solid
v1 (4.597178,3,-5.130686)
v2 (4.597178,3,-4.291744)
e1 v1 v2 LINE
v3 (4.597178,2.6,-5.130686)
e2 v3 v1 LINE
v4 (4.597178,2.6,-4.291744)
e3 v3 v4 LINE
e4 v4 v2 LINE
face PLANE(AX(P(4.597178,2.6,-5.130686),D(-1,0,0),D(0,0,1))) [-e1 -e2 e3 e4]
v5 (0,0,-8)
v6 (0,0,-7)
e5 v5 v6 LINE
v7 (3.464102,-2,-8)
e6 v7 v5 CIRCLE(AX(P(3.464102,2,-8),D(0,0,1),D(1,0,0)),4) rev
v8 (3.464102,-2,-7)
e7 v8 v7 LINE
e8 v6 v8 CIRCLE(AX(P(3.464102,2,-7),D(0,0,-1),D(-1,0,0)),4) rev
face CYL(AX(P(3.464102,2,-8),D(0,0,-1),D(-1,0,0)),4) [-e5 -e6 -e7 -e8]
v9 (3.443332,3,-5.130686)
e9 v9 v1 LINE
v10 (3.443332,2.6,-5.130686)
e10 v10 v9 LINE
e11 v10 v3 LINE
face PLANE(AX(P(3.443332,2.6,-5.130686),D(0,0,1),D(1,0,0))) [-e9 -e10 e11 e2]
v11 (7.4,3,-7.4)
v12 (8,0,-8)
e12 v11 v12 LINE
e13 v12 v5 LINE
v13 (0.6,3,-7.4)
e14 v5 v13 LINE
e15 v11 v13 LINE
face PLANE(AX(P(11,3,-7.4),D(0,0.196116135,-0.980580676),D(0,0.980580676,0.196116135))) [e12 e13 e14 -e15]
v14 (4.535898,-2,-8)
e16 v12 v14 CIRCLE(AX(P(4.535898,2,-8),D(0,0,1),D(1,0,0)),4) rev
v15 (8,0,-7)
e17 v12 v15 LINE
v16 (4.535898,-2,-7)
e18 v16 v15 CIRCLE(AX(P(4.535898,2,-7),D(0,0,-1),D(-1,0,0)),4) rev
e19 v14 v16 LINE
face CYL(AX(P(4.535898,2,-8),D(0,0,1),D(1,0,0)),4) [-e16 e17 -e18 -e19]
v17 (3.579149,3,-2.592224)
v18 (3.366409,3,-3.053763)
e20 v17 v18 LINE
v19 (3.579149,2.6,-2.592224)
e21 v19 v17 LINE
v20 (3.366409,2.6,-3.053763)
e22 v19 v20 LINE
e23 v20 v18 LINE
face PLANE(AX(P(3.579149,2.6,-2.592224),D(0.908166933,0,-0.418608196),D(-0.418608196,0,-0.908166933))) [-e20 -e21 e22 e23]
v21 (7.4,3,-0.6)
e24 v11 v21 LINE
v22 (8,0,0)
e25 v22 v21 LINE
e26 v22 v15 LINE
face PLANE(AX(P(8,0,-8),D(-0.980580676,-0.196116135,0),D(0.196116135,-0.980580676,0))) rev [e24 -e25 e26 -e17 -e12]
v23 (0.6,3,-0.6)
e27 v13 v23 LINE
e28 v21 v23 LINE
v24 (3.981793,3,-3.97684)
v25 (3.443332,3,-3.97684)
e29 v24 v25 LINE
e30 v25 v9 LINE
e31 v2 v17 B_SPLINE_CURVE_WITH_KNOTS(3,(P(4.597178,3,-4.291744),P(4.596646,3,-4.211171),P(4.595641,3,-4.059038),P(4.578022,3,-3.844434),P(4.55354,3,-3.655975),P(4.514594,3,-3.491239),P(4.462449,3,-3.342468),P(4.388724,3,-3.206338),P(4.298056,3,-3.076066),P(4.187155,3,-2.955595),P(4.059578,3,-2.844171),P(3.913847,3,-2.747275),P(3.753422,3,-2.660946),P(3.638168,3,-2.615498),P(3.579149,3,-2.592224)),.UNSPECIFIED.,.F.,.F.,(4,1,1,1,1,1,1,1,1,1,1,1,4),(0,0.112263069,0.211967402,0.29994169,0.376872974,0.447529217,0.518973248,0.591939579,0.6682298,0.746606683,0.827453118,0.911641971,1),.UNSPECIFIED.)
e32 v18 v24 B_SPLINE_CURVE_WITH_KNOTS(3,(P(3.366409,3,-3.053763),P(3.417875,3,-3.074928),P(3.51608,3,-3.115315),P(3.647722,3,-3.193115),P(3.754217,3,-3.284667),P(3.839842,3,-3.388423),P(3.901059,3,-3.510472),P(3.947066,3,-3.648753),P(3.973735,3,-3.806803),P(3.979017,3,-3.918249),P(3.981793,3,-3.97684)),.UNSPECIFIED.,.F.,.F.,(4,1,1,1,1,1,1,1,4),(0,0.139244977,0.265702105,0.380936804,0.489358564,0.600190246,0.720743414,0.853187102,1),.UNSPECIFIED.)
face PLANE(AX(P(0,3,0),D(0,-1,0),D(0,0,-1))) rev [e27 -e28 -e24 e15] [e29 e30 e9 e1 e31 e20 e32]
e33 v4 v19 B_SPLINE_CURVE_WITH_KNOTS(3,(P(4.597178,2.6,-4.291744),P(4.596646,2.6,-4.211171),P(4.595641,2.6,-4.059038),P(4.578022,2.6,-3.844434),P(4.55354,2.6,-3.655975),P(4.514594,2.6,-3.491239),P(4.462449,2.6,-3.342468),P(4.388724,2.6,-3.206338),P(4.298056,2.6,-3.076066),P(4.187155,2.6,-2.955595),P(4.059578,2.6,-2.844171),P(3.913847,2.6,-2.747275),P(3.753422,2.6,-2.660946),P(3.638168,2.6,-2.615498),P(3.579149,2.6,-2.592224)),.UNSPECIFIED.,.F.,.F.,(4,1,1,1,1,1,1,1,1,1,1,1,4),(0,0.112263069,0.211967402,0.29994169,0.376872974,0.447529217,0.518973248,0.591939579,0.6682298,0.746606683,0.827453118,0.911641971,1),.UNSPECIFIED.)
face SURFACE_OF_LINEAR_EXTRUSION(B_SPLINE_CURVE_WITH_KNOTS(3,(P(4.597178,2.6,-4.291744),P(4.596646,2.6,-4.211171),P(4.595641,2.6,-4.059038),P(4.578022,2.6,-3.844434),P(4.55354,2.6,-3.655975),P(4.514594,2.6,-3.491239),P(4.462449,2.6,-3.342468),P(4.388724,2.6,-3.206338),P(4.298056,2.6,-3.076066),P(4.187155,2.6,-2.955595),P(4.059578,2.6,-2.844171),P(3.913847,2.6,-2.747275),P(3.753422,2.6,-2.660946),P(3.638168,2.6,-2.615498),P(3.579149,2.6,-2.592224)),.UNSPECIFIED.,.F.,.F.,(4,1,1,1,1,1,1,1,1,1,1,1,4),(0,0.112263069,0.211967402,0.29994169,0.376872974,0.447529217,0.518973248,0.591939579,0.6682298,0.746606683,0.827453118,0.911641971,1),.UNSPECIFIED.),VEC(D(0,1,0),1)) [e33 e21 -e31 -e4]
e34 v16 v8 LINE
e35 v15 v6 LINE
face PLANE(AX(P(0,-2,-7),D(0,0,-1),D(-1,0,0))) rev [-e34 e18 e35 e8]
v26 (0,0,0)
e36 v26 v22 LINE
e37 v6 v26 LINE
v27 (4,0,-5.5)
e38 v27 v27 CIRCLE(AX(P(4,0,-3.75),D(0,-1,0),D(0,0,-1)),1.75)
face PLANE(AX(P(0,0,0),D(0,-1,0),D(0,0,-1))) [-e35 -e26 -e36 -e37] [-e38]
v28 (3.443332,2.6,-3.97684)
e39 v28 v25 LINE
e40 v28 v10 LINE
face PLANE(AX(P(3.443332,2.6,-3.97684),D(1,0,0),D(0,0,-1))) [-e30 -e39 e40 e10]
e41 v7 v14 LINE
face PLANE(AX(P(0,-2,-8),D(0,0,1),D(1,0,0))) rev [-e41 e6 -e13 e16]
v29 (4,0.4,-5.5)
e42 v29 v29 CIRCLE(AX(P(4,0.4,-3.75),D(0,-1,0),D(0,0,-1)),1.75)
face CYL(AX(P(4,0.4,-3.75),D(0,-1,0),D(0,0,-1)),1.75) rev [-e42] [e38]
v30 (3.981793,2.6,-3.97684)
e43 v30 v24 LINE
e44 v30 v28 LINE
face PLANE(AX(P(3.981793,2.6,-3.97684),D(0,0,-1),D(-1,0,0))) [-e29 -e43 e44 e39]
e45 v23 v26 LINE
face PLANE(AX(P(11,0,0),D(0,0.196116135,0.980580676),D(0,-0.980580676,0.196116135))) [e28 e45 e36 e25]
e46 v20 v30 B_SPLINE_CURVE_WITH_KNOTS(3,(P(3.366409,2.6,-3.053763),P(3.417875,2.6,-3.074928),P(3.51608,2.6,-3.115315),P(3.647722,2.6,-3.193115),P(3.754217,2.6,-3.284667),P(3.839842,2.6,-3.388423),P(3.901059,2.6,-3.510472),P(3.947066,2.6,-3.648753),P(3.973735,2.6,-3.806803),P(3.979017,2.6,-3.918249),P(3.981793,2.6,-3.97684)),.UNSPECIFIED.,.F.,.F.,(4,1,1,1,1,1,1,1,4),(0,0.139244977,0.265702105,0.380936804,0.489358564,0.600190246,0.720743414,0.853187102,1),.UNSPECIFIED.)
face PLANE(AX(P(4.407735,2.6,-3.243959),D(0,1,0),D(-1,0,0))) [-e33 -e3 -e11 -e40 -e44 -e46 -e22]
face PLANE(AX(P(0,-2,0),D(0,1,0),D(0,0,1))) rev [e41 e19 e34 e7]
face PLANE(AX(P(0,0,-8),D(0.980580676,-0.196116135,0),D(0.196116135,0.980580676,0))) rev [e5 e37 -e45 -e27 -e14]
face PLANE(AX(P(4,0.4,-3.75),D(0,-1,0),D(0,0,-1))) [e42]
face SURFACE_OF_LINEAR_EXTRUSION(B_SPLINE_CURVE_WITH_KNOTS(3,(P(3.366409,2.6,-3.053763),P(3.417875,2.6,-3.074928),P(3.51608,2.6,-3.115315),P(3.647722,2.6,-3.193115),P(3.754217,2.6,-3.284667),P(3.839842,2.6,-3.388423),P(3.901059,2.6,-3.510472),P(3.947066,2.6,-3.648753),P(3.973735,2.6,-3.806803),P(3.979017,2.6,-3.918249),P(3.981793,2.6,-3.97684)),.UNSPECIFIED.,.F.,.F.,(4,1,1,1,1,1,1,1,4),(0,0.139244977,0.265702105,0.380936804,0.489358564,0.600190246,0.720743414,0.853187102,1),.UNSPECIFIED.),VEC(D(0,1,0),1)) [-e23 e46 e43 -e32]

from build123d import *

# Parameters (mm, degrees)
SKETCH1_W               = 8
SKETCH1_H               = 8
BOSS_EXTRUDE1_DEPTH     = 3
CUT_EXTRUDE1_DEPTH      = 12.704699911
CUT_EXTRUDE1_DEPTH_BACK = 12.704699911
CUT_EXTRUDE2_DEPTH      = 11
SKETCH4_R               = 1.75
CUT_EXTRUDE3_DEPTH      = 0.4
SKETCH5_W               = 8
SKETCH5_H               = 1
BOSS_EXTRUDE2_DEPTH     = 2
FILLET1_R               = 4
CUT_EXTRUDE4_DEPTH      = 0.4


with BuildPart() as part:
    # Sketch1 → Boss-Extrude1 (new body)
    with BuildSketch(Plane(origin=(0, 0, 0), x_dir=(1, 0, 0), z_dir=(0, 1, 0))):
        with Locations((4, 4)):
            Rectangle(SKETCH1_W, SKETCH1_H)
    extrude(amount=BOSS_EXTRUDE1_DEPTH)

    # Sketch2 → Cut-Extrude1 (cut, two sides: drawn at the far end of the back side and taken through both)
    with BuildSketch(Plane.XY.offset(-CUT_EXTRUDE1_DEPTH_BACK)):
        Polygon((0, 0), (0.6, 3), (0, 3), align=None)
        Polygon((8, 0), (7.4, 3), (8, 3), align=None)
    extrude(amount=CUT_EXTRUDE1_DEPTH + CUT_EXTRUDE1_DEPTH_BACK, mode=Mode.SUBTRACT)

    # Sketch3 → Cut-Extrude2 (cut)
    with BuildSketch(Plane(origin=(0, 0, 0), x_dir=(0, 0, -1), z_dir=(1, 0, 0))):
        Polygon((0, 0), (0.6, 3), (0, 3), align=None)
        Polygon((8, 3), (7.4, 3), (8, 0), align=None)
    extrude(amount=CUT_EXTRUDE2_DEPTH, mode=Mode.SUBTRACT)

    # Sketch4 → Cut-Extrude3 (cut)
    with BuildSketch(Plane.XZ):
        with Locations(Location((4, -3.75, 0), (0, 0, 270))):
            Circle(SKETCH4_R)
    extrude(amount=-CUT_EXTRUDE3_DEPTH, mode=Mode.SUBTRACT)

    # Sketch5 → Boss-Extrude2 (add)
    with BuildSketch(Plane.XZ):
        with Locations((4, -7.5)):
            Rectangle(SKETCH5_W, SKETCH5_H)
    extrude(amount=BOSS_EXTRUDE2_DEPTH)

    # Fillet1
    # the kernel refuses this fillet: 4 mm, written as the material it takes off along each edge
    with BuildSketch(Plane(origin=(8, -2, -16.660254038), x_dir=(0, 1, 0), z_dir=(0, 0, 1)), Plane(origin=(0, -2, 1.660254038), x_dir=(0, 1, 0), z_dir=(0, 0, -1))) as fillet1_piece_1:
        with BuildLine():
            CenterArc((4, 3.464101615), FILLET1_R, 180, 60)
            Line((0, 3.464101615), (-0.08, 3.464101615))
            Line((-0.08, 3.464101615), (-0.08, 0))
            Line((-0.08, 0), (0, -0.08))
            ThreePointArc((0, -0.08), (1, -0.08), (1.96, -0.069282032))
            Line((1.96, -0.069282032), (2, 0))
        make_face()
    extrude(amount=18.320508076, mode=Mode.SUBTRACT)

    # Sketch6 → Cut-Extrude4 (cut)
    with BuildSketch(Plane(origin=(0, 3, 0), x_dir=(1, 0, 0), z_dir=(0, 1, 0))):
        with BuildLine():
            Line((3.443331895, 5.130686034), (4.597178049, 5.130686034))
            Line((4.597178049, 5.130686034), (4.597178049, 4.291743727))
            add(Edge.make_bspline(
                [(4.597178049, 4.291743727), (4.596645702, 4.211170655), (4.595640561, 4.059038126), (4.578021597, 3.844434295), (4.553540207, 3.655975372), (4.51459395, 3.491238943), (4.462448704, 3.342468302), (4.388723742, 3.206338125), (4.298056147, 3.076066307), (4.187154731, 2.955594738), (4.059577941, 2.844170634), (3.913847481, 2.747275335), (3.753421756, 2.660946408), (3.638168327, 2.615497851), (3.579149203, 2.592224496)],
                knots=[0, 0, 0, 0, 1.347156832, 2.543608823, 3.599300285, 4.522475688, 5.370350604, 6.227678973, 7.103274953, 8.018757603, 8.959280198, 9.929437417, 10.939703653, 12, 12, 12, 12], degree=3))
            Line((3.579149203, 2.592224496), (3.366408818, 3.053762957))
            add(Edge.make_bspline(
                [(3.366408818, 3.053762957), (3.417874874, 3.07492834), (3.516080495, 3.11531534), (3.647721841, 3.193115232), (3.754216523, 3.284666717), (3.839841548, 3.388423011), (3.901059293, 3.510472084), (3.947065575, 3.648752862), (3.973734578, 3.806802537), (3.979016553, 3.918249261), (3.981793434, 3.976839881)],
                knots=[0, 0, 0, 0, 1.113959817, 2.125616841, 3.047494432, 3.914868512, 4.801521967, 5.765947312, 6.825496818, 8, 8, 8, 8], degree=3))
            Line((3.981793434, 3.976839881), (3.443331895, 3.976839881))
            Line((3.443331895, 3.976839881), (3.443331895, 5.130686034))
        make_face()
    extrude(amount=-CUT_EXTRUDE4_DEPTH, mode=Mode.SUBTRACT)


solid = part.part
